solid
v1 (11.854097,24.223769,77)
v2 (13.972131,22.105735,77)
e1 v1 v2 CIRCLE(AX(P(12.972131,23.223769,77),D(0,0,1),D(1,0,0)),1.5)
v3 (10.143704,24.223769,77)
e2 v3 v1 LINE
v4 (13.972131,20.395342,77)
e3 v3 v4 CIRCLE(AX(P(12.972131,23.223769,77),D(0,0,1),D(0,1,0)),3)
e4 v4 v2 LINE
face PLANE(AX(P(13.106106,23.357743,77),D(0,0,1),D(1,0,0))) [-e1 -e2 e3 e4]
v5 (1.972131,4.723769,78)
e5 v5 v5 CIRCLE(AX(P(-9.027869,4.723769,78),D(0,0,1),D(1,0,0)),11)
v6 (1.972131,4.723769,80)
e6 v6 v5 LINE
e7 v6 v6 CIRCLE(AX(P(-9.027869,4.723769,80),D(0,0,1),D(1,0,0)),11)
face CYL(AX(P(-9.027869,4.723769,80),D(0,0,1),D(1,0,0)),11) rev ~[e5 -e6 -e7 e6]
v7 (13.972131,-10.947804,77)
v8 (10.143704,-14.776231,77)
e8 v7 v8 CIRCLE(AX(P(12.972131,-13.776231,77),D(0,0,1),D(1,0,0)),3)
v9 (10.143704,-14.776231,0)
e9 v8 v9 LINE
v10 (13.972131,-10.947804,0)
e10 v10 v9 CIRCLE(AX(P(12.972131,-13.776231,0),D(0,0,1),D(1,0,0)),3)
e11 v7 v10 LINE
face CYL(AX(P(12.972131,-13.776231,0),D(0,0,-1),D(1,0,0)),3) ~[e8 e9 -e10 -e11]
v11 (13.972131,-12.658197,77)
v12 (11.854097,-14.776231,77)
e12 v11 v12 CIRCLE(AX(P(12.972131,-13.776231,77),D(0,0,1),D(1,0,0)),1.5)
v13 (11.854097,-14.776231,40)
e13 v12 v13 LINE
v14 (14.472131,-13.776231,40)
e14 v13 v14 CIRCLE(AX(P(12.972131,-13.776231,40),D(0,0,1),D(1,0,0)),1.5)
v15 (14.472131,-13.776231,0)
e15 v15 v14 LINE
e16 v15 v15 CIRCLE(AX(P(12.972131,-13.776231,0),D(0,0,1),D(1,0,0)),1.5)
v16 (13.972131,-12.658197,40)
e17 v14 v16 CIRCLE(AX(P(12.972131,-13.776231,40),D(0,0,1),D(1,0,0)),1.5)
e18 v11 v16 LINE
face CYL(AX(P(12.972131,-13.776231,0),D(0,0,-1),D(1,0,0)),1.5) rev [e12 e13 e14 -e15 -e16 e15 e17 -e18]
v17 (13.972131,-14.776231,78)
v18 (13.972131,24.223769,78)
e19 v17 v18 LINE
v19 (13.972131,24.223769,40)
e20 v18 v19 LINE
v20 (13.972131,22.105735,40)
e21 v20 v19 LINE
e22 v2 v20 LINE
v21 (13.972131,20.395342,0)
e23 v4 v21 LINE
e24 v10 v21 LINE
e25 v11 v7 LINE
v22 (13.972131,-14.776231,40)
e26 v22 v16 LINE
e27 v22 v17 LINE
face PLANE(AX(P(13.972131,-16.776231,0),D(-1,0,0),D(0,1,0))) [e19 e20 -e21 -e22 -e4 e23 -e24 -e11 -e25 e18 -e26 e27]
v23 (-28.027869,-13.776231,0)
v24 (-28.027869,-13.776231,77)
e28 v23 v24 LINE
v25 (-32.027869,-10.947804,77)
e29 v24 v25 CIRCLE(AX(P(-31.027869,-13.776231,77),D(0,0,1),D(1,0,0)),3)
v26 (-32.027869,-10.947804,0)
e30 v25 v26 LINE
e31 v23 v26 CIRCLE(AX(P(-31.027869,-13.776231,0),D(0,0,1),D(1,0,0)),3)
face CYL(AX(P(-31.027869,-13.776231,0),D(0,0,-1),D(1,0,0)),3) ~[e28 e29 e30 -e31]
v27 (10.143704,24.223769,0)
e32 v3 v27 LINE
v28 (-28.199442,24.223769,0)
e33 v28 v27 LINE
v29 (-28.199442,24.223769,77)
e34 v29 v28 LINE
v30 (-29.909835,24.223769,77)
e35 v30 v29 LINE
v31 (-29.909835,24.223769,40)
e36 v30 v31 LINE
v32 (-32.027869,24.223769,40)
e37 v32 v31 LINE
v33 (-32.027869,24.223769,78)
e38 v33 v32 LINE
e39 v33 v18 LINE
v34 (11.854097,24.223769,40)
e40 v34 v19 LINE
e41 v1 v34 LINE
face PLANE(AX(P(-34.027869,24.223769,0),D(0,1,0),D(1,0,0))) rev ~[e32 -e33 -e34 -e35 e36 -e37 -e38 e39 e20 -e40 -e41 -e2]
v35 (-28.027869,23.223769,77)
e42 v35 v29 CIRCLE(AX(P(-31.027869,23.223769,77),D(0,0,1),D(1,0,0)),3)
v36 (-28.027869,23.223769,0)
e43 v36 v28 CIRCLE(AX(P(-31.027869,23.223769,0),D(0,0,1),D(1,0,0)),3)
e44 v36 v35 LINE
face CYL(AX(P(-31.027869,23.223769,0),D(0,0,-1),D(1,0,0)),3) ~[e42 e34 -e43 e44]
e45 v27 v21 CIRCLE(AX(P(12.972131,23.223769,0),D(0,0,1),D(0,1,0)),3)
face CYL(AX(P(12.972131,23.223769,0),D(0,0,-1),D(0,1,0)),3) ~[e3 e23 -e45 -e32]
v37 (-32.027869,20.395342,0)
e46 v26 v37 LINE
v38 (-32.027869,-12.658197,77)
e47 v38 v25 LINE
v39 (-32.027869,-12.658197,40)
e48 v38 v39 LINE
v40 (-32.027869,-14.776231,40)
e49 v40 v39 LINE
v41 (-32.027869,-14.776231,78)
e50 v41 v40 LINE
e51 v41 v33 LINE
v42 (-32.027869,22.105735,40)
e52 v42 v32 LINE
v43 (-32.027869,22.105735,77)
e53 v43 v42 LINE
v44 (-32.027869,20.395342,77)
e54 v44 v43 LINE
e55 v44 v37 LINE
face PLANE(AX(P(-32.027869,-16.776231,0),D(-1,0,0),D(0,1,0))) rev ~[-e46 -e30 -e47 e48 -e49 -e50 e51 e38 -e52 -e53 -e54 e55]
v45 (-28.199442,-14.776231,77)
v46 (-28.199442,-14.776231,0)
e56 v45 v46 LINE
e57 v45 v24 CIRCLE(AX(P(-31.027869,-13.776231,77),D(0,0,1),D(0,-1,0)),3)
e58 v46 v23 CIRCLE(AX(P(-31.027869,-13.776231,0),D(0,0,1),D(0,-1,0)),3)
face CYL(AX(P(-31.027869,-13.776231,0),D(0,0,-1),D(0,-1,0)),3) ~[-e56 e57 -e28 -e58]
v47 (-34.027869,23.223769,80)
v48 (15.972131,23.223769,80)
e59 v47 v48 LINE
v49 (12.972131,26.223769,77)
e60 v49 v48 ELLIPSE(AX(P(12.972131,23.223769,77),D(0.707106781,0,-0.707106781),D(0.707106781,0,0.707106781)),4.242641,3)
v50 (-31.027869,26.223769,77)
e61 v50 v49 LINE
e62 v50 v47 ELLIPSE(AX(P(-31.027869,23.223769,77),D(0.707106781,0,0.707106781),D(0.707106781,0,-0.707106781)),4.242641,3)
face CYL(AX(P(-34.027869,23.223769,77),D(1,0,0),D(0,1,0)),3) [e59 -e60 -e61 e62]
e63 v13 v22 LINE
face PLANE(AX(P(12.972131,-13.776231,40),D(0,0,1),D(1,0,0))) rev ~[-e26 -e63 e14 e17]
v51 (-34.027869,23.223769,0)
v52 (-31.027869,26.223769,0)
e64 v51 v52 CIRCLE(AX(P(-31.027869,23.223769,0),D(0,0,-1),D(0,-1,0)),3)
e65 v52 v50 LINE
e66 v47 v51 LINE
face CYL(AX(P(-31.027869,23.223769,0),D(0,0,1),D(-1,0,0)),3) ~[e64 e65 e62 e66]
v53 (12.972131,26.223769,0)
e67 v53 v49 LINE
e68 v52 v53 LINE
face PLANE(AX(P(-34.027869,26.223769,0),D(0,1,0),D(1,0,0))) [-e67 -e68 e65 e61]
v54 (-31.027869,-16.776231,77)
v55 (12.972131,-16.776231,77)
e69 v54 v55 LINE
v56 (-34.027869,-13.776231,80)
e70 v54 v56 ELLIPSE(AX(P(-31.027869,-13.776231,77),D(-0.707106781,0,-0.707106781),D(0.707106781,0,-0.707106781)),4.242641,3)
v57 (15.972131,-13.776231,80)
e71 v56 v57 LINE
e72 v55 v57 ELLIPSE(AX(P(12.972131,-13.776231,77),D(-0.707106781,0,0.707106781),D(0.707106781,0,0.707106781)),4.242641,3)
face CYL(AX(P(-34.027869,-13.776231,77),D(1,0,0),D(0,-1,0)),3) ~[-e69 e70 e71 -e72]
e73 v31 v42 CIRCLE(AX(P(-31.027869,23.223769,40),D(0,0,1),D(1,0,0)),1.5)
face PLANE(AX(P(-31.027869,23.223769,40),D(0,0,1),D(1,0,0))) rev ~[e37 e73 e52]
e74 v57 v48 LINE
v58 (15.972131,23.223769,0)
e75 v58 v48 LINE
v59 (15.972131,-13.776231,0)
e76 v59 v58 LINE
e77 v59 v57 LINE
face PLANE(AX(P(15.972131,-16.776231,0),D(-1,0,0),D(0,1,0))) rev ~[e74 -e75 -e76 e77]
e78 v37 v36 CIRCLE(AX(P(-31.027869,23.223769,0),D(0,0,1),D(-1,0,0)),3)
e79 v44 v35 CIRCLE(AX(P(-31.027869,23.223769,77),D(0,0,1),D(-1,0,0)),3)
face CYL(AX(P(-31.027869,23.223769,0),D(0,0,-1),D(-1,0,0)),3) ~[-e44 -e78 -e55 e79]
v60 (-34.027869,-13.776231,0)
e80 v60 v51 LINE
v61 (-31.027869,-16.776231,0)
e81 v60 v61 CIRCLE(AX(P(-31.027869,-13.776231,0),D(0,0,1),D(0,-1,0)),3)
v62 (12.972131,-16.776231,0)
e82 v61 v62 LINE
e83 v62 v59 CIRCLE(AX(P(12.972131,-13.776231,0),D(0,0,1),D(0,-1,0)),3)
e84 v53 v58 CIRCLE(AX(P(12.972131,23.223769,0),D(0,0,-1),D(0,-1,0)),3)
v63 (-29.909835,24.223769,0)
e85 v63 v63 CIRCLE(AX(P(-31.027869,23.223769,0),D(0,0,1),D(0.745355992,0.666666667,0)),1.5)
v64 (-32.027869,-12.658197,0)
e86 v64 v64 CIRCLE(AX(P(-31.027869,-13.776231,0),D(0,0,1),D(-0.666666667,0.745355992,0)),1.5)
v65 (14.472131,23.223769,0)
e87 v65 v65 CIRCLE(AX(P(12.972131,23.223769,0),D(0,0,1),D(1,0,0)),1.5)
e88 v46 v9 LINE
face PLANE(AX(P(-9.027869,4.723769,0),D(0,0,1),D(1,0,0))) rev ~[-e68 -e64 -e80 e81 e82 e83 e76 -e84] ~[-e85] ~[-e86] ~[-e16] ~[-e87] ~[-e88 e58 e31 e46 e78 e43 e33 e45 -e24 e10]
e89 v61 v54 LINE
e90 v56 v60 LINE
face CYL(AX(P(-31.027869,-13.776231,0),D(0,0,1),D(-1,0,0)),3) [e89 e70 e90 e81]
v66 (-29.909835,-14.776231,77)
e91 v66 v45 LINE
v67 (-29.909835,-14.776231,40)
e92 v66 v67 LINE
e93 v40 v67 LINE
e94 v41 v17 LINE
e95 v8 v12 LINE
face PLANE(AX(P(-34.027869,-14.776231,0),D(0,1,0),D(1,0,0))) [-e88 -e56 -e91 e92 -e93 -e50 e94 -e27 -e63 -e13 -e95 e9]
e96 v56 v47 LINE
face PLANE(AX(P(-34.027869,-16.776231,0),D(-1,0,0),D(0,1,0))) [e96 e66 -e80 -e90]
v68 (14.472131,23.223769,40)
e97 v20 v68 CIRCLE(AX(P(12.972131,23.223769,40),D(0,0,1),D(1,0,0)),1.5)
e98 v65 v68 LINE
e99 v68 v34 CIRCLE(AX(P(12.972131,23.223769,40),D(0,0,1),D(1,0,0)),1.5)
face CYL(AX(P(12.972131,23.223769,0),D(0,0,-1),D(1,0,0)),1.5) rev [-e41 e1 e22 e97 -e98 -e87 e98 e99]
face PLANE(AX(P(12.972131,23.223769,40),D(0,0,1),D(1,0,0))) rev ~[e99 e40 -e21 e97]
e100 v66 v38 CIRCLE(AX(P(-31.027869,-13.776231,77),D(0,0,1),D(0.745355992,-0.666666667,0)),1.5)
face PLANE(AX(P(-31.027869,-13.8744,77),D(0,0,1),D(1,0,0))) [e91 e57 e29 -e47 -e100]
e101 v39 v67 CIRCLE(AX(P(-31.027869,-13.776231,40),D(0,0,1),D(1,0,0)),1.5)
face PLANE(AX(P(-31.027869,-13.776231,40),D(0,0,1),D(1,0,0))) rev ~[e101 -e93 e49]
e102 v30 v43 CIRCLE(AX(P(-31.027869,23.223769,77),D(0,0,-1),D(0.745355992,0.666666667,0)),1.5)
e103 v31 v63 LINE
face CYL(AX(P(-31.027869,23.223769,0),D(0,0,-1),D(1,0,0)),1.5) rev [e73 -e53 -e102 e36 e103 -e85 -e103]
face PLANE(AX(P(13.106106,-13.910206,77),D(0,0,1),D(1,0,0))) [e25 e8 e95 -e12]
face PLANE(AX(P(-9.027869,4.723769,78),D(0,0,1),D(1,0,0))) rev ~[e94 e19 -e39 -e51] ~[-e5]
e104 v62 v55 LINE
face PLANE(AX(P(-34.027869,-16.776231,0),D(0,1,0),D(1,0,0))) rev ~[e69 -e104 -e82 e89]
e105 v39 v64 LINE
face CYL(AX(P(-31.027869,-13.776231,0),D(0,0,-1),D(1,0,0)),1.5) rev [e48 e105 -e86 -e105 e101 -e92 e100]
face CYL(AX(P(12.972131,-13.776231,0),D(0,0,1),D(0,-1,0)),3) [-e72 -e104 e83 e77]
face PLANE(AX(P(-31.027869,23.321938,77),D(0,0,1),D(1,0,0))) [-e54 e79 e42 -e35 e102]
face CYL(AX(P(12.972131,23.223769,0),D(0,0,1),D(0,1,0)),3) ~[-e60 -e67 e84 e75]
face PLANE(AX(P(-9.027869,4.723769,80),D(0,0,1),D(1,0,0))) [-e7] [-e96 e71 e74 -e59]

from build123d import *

# Parameters (mm, degrees)
F0_W     = 50
F0_H     = 43
F0_R     = 1.5
F1_DEPTH = 80
F3_T     = -2
F2_R     = 11
F4_DEPTH = 3.1
F5_R     = 3
F6_R     = 1.5
F7_DEPTH = 77
F8_DEPTH = 40


# Not quite as in the source:
# - a feature names something its author has since deleted; it is built from what else it names


with BuildPart() as f1:
    # F0 (on Top) → F1 (new body)
    with BuildSketch(Plane.XY):
        with Locations((-9.0278687937, 4.7237686813)):
            Rectangle(F0_W, F0_H)
        with Locations((-31.0278687937, -13.7762313187)):
            Circle(F0_R, mode=Mode.SUBTRACT)
        with Locations((12.9721312063, -13.7762313187)):
            Circle(F0_R, mode=Mode.SUBTRACT)
        with Locations((-31.0278687937, 23.2237686813)):
            Circle(F0_R, mode=Mode.SUBTRACT)
        with Locations((12.9721312063, 23.2237686813)):
            Circle(F0_R, mode=Mode.SUBTRACT)
        with Locations((12.9721312063, 23.2237686813)):
            Circle(F0_R)
        with Locations((12.9721312063, -13.7762313187)):
            Circle(F0_R)
        with Locations((-31.0278687937, -13.7762313187)):
            Circle(F0_R)
        with Locations((-31.0278687937, 23.2237686813)):
            Circle(F0_R)
    extrude(amount=F1_DEPTH)

    # F3
    f3_openings = [f1.faces().sort_by_distance(p)[0] for p in [
        (-9.027869, 4.723769, 0),
    ]]
    offset(amount=F3_T, openings=f3_openings)

    # F2 (on face) → F4 (cut)
    with BuildSketch(Plane.XY.offset(80)):
        with Locations((-9.0278687937, 4.7237686813)):
            Circle(F2_R)
    extrude(amount=-F4_DEPTH, mode=Mode.SUBTRACT)

    # F5
    f5_edges = [f1.edges().sort_by_distance(p)[0] for p in [
        (15.972131, 26.223769, 40),
        (-9.027869, 26.223769, 80),
        (-34.027869, 26.223769, 40),
        (15.972131, -16.776231, 40),
        (-9.027869, -16.776231, 80),
        (-34.027869, -16.776231, 40),
    ]]
    fillet(f5_edges, radius=F5_R)

    # F6 (on face) → F7 (join)
    with BuildSketch(Plane.XY):
        with BuildLine():
            ThreePointArc((12.9721312104, -16.7762313187), (15.0934515513, -15.8975516608), (15.9721312063, -13.7762313187))
            ThreePointArc((15.9721312063, -13.7762313187), (10.8508108613, -11.6549109766), (12.9721312104, -16.7762313187))
        make_face()
        with Locations((12.9721312063, -13.7762313187)):
            Circle(F6_R, mode=Mode.SUBTRACT)
        with BuildLine():
            ThreePointArc((12.9721312063, 26.2237686813), (10.8508108627, 21.1024483377), (15.9721312063, 23.2237686813))
            ThreePointArc((15.9721312063, 23.2237686813), (15.0934515498, 25.3450890248), (12.9721312063, 26.2237686813))
        make_face()
        with Locations((12.9721312063, 23.2237686813)):
            Circle(F6_R, mode=Mode.SUBTRACT)
        with BuildLine():
            ThreePointArc((-34.0278687937, -13.776231286), (-33.1491891488, -15.8975516507), (-31.0278687937, -16.7762313187))
            ThreePointArc((-31.0278687937, -16.7762313187), (-28.9065484502, -15.8975516623), (-28.0278687937, -13.7762313187))
            ThreePointArc((-28.0278687937, -13.7762313187), (-31.0278687774, -10.7762313187), (-34.0278687937, -13.776231286))
        make_face()
        with Locations((-31.0278687937, -13.7762313187)):
            Circle(F6_R, mode=Mode.SUBTRACT)
        with BuildLine():
            ThreePointArc((-28.0278687937, 23.2237686813), (-28.9065484366, 25.3450890113), (-31.0278687555, 26.2237686813))
            ThreePointArc((-31.0278687555, 26.2237686813), (-33.1491891237, 25.3450890384), (-34.0278687937, 23.2237686813))
            ThreePointArc((-34.0278687937, 23.2237686813), (-31.0278687937, 20.2237686813), (-28.0278687937, 23.2237686813))
        make_face()
        with Locations((-31.0278687937, 23.2237686813)):
            Circle(F6_R, mode=Mode.SUBTRACT)
    extrude(amount=F7_DEPTH)

    # F0 (on Top) → F8 (cut)
    with BuildSketch(Plane.XY):
        with Locations((-31.0278687937, 23.2237686813)):
            Circle(F0_R)
        with Locations((12.9721312063, 23.2237686813)):
            Circle(F0_R)
        with Locations((-31.0278687937, -13.7762313187)):
            Circle(F0_R)
        with Locations((12.9721312063, -13.7762313187)):
            Circle(F0_R)
    extrude(amount=F8_DEPTH, mode=Mode.SUBTRACT)


solid = f1.part
